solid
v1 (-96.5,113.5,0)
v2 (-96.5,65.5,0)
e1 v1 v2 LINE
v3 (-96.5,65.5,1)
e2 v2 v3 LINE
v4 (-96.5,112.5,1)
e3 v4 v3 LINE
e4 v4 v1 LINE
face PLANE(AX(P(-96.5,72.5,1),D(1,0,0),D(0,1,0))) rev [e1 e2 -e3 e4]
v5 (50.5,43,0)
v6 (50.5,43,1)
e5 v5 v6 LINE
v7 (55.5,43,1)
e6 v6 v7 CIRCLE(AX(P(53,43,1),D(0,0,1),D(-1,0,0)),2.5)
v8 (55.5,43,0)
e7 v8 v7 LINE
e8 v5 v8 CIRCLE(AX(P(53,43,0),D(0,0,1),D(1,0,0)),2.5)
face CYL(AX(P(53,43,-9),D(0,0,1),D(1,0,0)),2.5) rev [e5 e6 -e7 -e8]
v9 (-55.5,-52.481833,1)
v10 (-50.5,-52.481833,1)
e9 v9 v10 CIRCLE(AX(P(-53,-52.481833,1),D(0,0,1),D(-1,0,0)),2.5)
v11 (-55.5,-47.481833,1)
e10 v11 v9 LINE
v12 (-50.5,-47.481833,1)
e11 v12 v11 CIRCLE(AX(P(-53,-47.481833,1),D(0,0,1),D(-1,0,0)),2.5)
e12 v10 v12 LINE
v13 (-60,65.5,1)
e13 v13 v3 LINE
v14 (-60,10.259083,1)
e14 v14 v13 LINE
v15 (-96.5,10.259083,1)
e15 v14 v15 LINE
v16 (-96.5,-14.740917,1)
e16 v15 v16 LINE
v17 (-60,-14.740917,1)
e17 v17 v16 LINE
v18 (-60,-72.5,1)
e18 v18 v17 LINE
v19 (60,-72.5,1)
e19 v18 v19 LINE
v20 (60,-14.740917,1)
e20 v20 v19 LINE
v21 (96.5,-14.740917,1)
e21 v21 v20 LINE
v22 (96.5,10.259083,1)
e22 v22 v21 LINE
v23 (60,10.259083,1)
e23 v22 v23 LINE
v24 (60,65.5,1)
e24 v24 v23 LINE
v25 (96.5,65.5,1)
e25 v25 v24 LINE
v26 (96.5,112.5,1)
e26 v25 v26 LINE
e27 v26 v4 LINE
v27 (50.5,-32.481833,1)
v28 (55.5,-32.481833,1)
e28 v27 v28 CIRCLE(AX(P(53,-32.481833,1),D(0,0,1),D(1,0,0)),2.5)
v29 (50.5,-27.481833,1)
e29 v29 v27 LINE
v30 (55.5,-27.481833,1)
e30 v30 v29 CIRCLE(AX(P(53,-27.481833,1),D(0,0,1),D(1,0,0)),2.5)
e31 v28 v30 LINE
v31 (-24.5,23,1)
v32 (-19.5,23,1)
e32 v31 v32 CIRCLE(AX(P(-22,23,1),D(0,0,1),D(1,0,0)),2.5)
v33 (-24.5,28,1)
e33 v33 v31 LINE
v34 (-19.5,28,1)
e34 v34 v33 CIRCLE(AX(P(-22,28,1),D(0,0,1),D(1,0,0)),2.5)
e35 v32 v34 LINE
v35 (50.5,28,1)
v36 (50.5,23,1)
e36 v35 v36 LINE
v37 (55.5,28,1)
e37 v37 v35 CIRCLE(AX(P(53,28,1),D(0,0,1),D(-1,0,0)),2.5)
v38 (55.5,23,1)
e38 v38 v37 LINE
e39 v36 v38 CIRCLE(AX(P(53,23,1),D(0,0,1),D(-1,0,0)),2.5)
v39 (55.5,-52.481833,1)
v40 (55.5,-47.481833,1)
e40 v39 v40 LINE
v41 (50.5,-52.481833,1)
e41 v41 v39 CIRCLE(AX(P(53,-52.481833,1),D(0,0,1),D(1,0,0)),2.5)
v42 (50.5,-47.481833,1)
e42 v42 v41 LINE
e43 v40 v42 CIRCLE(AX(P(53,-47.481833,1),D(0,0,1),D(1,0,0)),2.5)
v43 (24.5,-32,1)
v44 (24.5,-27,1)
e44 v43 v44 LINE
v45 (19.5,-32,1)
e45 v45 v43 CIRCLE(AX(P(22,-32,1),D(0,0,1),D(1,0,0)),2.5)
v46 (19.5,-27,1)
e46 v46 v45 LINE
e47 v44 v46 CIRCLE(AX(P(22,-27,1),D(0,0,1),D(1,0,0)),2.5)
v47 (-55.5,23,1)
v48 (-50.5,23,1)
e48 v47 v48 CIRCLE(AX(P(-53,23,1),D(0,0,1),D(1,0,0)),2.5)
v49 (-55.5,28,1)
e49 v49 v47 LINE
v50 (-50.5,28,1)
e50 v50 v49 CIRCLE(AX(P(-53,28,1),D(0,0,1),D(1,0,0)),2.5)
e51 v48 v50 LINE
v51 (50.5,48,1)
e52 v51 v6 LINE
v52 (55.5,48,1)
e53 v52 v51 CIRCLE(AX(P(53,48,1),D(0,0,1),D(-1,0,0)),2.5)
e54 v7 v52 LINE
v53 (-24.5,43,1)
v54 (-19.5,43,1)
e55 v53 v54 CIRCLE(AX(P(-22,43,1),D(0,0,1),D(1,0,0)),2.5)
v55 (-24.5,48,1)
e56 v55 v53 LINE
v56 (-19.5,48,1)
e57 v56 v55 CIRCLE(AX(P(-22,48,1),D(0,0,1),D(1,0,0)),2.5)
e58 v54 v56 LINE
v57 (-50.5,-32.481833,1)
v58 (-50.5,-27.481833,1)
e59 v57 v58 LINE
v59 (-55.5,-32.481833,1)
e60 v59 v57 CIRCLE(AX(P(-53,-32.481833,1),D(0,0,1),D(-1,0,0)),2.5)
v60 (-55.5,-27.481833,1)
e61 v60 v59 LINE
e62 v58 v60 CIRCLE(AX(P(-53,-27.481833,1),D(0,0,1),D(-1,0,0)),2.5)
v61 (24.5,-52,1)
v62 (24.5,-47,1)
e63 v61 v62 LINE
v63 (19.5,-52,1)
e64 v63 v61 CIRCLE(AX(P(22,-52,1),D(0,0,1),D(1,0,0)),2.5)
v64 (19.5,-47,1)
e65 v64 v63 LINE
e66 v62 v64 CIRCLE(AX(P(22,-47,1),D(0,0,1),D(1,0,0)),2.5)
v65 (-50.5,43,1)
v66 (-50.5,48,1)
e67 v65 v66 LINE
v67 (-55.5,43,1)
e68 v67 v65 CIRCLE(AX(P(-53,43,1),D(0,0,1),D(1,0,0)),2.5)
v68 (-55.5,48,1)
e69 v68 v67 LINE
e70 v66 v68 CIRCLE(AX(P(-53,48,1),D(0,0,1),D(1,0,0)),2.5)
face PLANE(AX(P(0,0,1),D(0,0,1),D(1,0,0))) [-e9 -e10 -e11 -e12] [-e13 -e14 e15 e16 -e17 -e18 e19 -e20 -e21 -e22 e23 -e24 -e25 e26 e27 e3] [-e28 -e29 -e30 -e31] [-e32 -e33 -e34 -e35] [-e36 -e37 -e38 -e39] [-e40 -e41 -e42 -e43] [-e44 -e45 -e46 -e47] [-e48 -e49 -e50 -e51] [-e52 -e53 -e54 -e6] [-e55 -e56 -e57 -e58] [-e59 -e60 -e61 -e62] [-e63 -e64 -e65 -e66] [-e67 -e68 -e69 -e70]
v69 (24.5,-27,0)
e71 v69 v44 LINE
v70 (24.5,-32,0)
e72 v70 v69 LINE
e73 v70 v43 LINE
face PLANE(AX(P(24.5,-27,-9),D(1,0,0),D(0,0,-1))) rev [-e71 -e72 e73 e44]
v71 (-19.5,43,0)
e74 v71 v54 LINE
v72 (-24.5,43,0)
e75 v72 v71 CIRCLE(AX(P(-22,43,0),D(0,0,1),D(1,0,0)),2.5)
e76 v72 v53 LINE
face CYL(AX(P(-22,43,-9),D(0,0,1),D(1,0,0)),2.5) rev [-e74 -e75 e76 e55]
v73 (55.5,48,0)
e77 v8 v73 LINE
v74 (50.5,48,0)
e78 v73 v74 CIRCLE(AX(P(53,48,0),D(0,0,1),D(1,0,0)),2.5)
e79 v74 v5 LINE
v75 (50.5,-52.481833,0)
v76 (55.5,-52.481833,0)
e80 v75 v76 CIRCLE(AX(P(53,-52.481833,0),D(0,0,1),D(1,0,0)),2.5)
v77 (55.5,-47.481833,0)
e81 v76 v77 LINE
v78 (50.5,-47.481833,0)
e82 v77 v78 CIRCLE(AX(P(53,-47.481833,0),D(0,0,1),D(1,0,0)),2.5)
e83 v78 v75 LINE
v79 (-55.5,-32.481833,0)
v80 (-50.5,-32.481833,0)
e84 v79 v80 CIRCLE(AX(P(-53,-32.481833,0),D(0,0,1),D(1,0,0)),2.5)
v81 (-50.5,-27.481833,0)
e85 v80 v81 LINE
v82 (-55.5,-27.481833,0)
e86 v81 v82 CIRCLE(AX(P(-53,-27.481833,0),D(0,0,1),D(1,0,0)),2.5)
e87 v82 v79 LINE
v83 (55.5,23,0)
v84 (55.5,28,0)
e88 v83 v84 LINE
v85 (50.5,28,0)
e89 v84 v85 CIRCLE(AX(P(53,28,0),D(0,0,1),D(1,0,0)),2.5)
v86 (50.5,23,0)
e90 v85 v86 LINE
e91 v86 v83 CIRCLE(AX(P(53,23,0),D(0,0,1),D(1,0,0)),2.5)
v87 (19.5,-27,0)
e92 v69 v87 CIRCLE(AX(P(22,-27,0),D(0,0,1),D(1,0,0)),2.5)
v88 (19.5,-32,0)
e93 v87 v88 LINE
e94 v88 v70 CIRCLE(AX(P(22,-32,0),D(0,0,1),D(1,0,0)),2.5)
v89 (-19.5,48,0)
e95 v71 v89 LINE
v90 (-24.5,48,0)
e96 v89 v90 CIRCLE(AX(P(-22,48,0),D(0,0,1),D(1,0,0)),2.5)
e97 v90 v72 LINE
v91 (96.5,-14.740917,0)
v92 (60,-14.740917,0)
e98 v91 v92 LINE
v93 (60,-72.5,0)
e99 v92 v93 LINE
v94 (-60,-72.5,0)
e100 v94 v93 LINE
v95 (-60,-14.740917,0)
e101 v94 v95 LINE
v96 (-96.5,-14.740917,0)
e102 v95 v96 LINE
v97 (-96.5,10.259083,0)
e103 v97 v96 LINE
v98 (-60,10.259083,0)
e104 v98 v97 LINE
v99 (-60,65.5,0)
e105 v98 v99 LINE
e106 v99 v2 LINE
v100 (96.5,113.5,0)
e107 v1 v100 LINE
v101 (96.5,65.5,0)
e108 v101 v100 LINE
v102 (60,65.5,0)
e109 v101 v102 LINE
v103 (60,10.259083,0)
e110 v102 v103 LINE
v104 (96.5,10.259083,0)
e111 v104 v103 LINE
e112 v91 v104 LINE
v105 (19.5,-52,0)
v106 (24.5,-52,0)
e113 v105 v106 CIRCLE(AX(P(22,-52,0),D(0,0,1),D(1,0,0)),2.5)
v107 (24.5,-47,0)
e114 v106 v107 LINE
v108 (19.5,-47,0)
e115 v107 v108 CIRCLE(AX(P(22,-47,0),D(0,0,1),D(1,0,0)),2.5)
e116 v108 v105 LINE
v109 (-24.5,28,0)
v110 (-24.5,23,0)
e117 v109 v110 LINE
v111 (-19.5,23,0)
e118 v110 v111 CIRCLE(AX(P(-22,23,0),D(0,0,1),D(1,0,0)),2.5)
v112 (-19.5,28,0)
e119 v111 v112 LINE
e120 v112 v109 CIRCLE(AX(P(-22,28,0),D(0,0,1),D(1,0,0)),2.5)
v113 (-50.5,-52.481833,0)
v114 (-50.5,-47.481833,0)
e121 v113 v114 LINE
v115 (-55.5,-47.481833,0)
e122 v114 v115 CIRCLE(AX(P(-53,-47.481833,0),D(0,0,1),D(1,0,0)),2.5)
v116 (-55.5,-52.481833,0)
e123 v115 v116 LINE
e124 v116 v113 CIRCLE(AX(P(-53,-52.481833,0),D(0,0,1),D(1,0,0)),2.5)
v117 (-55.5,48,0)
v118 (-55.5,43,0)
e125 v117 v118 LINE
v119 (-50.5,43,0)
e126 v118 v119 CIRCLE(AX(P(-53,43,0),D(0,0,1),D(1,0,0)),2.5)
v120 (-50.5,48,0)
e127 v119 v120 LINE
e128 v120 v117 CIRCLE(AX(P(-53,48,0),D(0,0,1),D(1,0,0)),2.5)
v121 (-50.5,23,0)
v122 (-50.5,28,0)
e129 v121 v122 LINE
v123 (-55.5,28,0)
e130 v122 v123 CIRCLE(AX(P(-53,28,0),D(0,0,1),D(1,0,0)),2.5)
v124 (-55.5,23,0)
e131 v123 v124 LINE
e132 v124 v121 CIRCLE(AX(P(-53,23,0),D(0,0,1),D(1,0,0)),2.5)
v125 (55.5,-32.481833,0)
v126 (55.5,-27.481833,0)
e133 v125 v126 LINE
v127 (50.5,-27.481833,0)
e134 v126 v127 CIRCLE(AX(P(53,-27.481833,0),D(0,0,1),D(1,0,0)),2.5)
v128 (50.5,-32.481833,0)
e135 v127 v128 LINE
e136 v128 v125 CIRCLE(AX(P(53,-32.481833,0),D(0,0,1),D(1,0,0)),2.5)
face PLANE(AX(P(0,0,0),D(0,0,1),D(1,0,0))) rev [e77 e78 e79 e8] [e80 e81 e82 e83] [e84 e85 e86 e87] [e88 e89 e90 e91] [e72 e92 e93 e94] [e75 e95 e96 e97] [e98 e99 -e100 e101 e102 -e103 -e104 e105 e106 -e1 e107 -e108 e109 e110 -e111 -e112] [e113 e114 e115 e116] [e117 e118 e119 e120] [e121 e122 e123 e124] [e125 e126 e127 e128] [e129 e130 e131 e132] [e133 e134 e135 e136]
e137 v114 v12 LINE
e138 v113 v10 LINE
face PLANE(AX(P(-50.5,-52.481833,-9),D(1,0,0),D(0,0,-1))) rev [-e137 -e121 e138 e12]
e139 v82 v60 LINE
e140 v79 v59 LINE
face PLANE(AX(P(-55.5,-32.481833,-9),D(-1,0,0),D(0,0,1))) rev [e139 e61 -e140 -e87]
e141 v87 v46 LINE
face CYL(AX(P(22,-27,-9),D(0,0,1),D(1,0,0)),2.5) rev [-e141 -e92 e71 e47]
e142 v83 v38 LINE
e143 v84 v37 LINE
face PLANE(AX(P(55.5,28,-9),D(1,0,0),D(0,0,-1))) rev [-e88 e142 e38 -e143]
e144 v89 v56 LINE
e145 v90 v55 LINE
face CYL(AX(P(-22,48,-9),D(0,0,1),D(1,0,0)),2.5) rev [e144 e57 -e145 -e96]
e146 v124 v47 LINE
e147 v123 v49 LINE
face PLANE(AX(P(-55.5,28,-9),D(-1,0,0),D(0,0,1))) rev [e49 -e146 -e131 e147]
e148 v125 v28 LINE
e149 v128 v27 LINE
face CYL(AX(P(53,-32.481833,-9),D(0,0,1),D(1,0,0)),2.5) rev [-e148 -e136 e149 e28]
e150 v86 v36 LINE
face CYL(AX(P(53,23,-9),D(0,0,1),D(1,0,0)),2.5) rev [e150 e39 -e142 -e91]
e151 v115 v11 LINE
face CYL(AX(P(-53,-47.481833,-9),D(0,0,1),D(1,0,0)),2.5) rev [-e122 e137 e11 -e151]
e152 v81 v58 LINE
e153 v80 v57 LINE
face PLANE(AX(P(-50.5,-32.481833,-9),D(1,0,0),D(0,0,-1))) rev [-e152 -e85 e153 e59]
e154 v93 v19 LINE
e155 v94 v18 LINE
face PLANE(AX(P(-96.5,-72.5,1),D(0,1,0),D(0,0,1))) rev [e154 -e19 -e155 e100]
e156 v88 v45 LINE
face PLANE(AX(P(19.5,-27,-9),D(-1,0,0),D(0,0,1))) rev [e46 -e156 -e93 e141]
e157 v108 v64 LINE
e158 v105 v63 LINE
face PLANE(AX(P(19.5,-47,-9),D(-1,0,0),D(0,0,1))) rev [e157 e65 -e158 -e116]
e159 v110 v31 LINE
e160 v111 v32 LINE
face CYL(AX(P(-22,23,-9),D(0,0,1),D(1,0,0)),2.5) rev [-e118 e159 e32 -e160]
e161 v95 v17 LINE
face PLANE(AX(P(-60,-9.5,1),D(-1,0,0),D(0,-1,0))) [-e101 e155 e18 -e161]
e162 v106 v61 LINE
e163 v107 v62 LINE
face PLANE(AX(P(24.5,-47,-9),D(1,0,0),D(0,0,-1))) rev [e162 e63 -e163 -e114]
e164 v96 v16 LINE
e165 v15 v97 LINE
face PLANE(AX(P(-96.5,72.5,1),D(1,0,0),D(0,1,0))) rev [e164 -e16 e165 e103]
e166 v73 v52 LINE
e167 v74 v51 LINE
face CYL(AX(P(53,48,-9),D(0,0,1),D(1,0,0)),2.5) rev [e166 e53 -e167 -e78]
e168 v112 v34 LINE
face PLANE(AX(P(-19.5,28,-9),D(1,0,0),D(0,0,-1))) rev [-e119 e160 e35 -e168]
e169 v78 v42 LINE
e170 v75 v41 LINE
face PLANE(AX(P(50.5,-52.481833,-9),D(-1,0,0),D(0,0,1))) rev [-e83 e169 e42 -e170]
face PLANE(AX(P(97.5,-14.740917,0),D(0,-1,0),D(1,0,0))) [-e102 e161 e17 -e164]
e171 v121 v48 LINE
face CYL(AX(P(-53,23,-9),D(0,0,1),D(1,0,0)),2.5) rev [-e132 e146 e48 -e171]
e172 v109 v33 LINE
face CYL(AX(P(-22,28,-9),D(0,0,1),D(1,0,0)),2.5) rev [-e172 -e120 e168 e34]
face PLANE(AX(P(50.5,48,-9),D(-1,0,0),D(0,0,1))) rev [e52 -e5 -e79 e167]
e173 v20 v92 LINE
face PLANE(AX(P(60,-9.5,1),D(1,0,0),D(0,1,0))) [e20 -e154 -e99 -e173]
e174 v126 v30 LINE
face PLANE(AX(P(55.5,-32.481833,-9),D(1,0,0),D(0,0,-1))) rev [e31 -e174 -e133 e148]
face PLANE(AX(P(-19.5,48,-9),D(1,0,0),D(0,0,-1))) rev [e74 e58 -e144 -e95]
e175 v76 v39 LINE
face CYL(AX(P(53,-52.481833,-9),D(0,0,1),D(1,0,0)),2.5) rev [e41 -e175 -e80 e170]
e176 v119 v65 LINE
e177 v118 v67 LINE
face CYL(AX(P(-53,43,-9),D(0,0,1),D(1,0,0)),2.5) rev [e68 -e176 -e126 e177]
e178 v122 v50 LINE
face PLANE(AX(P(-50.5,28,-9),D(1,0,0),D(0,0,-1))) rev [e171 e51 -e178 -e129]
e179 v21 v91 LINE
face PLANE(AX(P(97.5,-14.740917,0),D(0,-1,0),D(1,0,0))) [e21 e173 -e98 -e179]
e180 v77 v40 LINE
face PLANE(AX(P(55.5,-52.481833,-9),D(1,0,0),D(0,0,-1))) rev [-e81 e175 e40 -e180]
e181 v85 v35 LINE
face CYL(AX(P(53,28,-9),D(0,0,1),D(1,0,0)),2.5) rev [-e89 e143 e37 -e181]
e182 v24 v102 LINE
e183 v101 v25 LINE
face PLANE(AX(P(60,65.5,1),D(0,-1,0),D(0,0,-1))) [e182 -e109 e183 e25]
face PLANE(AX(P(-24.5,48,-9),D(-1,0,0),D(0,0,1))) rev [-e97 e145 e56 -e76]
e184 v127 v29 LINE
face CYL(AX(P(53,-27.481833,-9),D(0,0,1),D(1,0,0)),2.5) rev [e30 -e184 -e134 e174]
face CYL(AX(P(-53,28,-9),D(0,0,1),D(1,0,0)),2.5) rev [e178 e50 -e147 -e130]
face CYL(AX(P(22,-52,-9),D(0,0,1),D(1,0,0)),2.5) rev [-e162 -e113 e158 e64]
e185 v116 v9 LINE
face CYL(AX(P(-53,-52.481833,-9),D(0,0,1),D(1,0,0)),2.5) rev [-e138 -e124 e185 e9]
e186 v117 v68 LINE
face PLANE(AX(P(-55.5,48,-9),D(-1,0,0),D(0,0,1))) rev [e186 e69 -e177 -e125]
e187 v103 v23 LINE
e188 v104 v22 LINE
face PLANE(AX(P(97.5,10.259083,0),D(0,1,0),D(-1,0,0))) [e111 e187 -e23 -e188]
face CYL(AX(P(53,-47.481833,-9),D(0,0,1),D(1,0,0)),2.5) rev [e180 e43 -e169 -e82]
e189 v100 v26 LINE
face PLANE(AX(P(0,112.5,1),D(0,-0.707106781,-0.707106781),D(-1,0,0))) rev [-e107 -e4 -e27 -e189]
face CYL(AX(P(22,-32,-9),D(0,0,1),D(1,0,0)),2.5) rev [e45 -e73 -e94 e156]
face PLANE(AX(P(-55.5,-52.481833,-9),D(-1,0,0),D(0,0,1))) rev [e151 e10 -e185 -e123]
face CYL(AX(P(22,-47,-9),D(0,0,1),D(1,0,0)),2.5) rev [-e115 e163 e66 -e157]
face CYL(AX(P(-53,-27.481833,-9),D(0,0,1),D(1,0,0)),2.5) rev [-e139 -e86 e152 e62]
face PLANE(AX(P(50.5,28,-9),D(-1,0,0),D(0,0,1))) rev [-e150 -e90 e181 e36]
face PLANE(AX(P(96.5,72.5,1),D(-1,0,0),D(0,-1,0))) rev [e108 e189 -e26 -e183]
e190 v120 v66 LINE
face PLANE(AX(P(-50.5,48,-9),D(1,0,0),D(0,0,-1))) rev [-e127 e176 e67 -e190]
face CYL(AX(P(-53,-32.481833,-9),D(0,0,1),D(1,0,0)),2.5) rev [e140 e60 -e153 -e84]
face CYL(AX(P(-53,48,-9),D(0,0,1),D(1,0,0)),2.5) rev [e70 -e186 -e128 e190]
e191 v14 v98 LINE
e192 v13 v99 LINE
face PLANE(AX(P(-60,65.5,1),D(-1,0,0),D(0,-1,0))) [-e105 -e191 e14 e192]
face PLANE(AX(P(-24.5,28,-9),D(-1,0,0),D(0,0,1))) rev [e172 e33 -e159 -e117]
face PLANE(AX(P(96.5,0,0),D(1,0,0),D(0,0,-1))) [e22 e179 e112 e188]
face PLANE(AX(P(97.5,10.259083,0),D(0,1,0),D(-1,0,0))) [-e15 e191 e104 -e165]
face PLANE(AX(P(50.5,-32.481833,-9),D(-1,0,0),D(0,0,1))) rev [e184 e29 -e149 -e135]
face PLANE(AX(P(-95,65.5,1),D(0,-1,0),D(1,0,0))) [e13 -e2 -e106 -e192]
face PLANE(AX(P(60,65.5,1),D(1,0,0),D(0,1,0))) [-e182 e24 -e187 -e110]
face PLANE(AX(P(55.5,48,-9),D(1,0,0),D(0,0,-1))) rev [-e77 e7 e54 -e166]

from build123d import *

# Parameters (mm, degrees)
SKETCH1_W           = 193
SKETCH1_H           = 145
SKETCH1_W_2         = 35
SKETCH1_H_2         = 60
BOSS_EXTRUDE1_DEPTH = 1
SKETCH2_R           = 2.5
CUT_EXTRUDE1_DEPTH  = 3
SKETCH3_W           = 1.5
SKETCH3_H           = 60.155824732
SKETCH3_H_2         = 60
CUT_EXTRUDE2_DEPTH  = 3
SKETCH4_W           = 193
SKETCH4_H           = 42
BOSS_EXTRUDE2_DEPTH = 1
SKETCH5_W           = 1
SKETCH5_H           = 25
BOSS_EXTRUDE3_DEPTH = 194
CHAMFER1_SIZE       = 2
SKETCH7_W           = 36.5
SKETCH7_H           = 3
CUT_EXTRUDE3_DEPTH  = 10
SKETCH8_R           = 2.5
CUT_EXTRUDE4_DEPTH  = 10
SKETCH11_W          = 1
SKETCH11_H          = 25
CUT_EXTRUDE5_DEPTH  = 1
CUT_EXTRUDE6_DEPTH  = 10


with BuildPart() as part:
    # Sketch1 → Boss-Extrude1 (new body)
    with BuildSketch(Plane.XY):
        Rectangle(SKETCH1_W, SKETCH1_H)
        with Locations((-77.5, 35.5)):
            Rectangle(SKETCH1_W_2, SKETCH1_H_2, mode=Mode.SUBTRACT)
        with Locations((77.5, 35.5)):
            Rectangle(SKETCH1_W_2, SKETCH1_H_2, mode=Mode.SUBTRACT)
        with Locations((77.5, -39.5)):
            Rectangle(SKETCH1_W_2, SKETCH1_H_2, mode=Mode.SUBTRACT)
        with Locations((-77.5, -39.5)):
            Rectangle(SKETCH1_W_2, SKETCH1_H_2, mode=Mode.SUBTRACT)
    extrude(amount=BOSS_EXTRUDE1_DEPTH)

    # Sketch2 → Cut-Extrude1 (cut)
    with BuildSketch(Plane.XY.offset(1)):
        with Locations((-53, 45.5)):
            Circle(SKETCH2_R)
        with Locations((-53, 25.5)):
            Circle(SKETCH2_R)
        with Locations((-53, -49.5)):
            Circle(SKETCH2_R)
        with Locations((-53, -29.5)):
            Circle(SKETCH2_R)
        with Locations((53, -29.5)):
            Circle(SKETCH2_R)
        with Locations((53, -49.5)):
            Circle(SKETCH2_R)
        with Locations((53, 25.5)):
            Circle(SKETCH2_R)
        with Locations((53, 45.5)):
            Circle(SKETCH2_R)
    extrude(amount=-CUT_EXTRUDE1_DEPTH, mode=Mode.SUBTRACT)

    # Sketch3 → Cut-Extrude2 (cut)
    with BuildSketch(Plane.XY.offset(1)):
        with Locations((-95.75, 35.422087634)):
            Rectangle(SKETCH3_W, SKETCH3_H)
        with Locations((-95.75, -39.5)):
            Rectangle(SKETCH3_W, SKETCH3_H_2)
        with Locations((95.75, -39.5)):
            Rectangle(SKETCH3_W, SKETCH3_H_2)
        with Locations((95.75, 35.5)):
            Rectangle(SKETCH3_W, SKETCH3_H_2)
    extrude(amount=-CUT_EXTRUDE2_DEPTH, mode=Mode.SUBTRACT)

    # Sketch4 → Boss-Extrude2 (add)
    with BuildSketch(Plane.XY.offset(1)):
        with Locations((0, 93.5)):
            Rectangle(SKETCH4_W, SKETCH4_H)
    extrude(amount=-BOSS_EXTRUDE2_DEPTH)

    # Sketch5 → Boss-Extrude3 (add)
    with BuildSketch(Plane.ZY.offset(96.5)):
        with Locations((0.5, -2.240916736)):
            Rectangle(SKETCH5_W, SKETCH5_H)
    extrude(amount=-BOSS_EXTRUDE3_DEPTH)

    # Chamfer1
    # the kernel refuses this chamfer: 2 mm, written as the material it takes off along each edge
    with BuildSketch(Plane(origin=(101.643365976, 114.5, 1), x_dir=(0, -0.9996219169112968, 0.027495876610586306), z_dir=(-1, 0, 0))) as chamfer1_piece_1:
        Polygon((CHAMFER1_SIZE * 0.999621916911, -CHAMFER1_SIZE * 0.0274958766106), (-CHAMFER1_SIZE * 0.0274958766106, -CHAMFER1_SIZE * 0.999621916911), (0, 0), align=None)
    extrude(amount=203.286731952, mode=Mode.SUBTRACT)

    # Sketch7 → Cut-Extrude3 (cut)
    with BuildSketch(Plane.XY.offset(1)):
        with Locations((-78.25, -71)):
            Rectangle(SKETCH7_W, SKETCH7_H)
        with Locations((78.25, -71)):
            Rectangle(SKETCH7_W, SKETCH7_H)
    extrude(amount=-CUT_EXTRUDE3_DEPTH, mode=Mode.SUBTRACT)

    # Sketch8 → Cut-Extrude4 (cut)
    with BuildSketch(Plane.XY.offset(1)):
        with Locations((-22, 45.5)):
            Circle(SKETCH8_R)
        with Locations((-22, 25.5)):
            Circle(SKETCH8_R)
        with Locations((22, -29.5)):
            Circle(SKETCH8_R)
        with Locations((22, -49.5)):
            Circle(SKETCH8_R)
    extrude(amount=-CUT_EXTRUDE4_DEPTH, mode=Mode.SUBTRACT)

    # Sketch11 → Cut-Extrude5 (cut)
    with BuildSketch(Plane(origin=(97.5, 0, 0), x_dir=(0, 0, -1), z_dir=(1, 0, 0))):
        with Locations((-0.5, -2.240916736)):
            Rectangle(SKETCH11_W, SKETCH11_H)
    extrude(amount=-CUT_EXTRUDE5_DEPTH, mode=Mode.SUBTRACT)

    # Sketch12 → Cut-Extrude6 (cut)
    with BuildSketch(Plane.XY.offset(1)):
        with BuildLine():
            Line((-50.5, 48), (-50.5, 43))
            ThreePointArc((-50.5, 43), (-53, 40.5), (-55.5, 43))
            Line((-55.5, 43), (-55.5, 48))
            ThreePointArc((-55.5, 48), (-53, 50.5), (-50.5, 48))
        make_face()
        with BuildLine():
            Line((-19.5, 48), (-19.5, 43))
            ThreePointArc((-19.5, 43), (-22, 40.5), (-24.5, 43))
            Line((-24.5, 43), (-24.5, 48))
            ThreePointArc((-24.5, 48), (-22, 50.5), (-19.5, 48))
        make_face()
        with BuildLine():
            Line((-19.5, 28), (-19.5, 23))
            ThreePointArc((-19.5, 23), (-22, 20.5), (-24.5, 23))
            Line((-24.5, 23), (-24.5, 28))
            ThreePointArc((-24.5, 28), (-22, 30.5), (-19.5, 28))
        make_face()
        with BuildLine():
            Line((-50.5, 28), (-50.5, 23))
            ThreePointArc((-50.5, 23), (-53, 20.5), (-55.5, 23))
            Line((-55.5, 23), (-55.5, 28))
            ThreePointArc((-55.5, 28), (-53, 30.5), (-50.5, 28))
        make_face()
        with BuildLine():
            Line((50.5, 28), (50.5, 23))
            ThreePointArc((50.5, 23), (53, 20.5), (55.5, 23))
            Line((55.5, 23), (55.5, 28))
            ThreePointArc((55.5, 28), (53, 30.5), (50.5, 28))
        make_face()
        with BuildLine():
            Line((50.5, 48), (50.5, 43))
            ThreePointArc((50.5, 43), (53, 40.5), (55.5, 43))
            Line((55.5, 43), (55.5, 48))
            ThreePointArc((55.5, 48), (53, 50.5), (50.5, 48))
        make_face()
        with BuildLine():
            Line((50.5, -52.481833472), (50.5, -47.481833472))
            ThreePointArc((50.5, -47.481833472), (53, -44.981833472), (55.5, -47.481833472))
            Line((55.5, -47.481833472), (55.5, -52.481833472))
            ThreePointArc((55.5, -52.481833472), (53, -54.981833472), (50.5, -52.481833472))
        make_face()
        with BuildLine():
            Line((50.5, -32.481833472), (50.5, -27.481833472))
            ThreePointArc((50.5, -27.481833472), (53, -24.981833472), (55.5, -27.481833472))
            Line((55.5, -27.481833472), (55.5, -32.481833472))
            ThreePointArc((55.5, -32.481833472), (53, -34.981833472), (50.5, -32.481833472))
        make_face()
        with BuildLine():
            Line((-50.5, -32.481833472), (-50.5, -27.481833472))
            ThreePointArc((-50.5, -27.481833472), (-53, -24.981833472), (-55.5, -27.481833472))
            Line((-55.5, -27.481833472), (-55.5, -32.481833472))
            ThreePointArc((-55.5, -32.481833472), (-53, -34.981833472), (-50.5, -32.481833472))
        make_face()
        with BuildLine():
            Line((-50.5, -52.481833472), (-50.5, -47.481833472))
            ThreePointArc((-50.5, -47.481833472), (-53, -44.981833472), (-55.5, -47.481833472))
            Line((-55.5, -47.481833472), (-55.5, -52.481833472))
            ThreePointArc((-55.5, -52.481833472), (-53, -54.981833472), (-50.5, -52.481833472))
        make_face()
        with BuildLine():
            Line((24.5, -27), (24.5, -32))
            ThreePointArc((24.5, -32), (22, -34.5), (19.5, -32))
            Line((19.5, -32), (19.5, -27))
            ThreePointArc((19.5, -27), (22, -24.5), (24.5, -27))
        make_face()
        with BuildLine():
            Line((24.5, -47), (24.5, -52))
            ThreePointArc((24.5, -52), (22, -54.5), (19.5, -52))
            Line((19.5, -52), (19.5, -47))
            ThreePointArc((19.5, -47), (22, -44.5), (24.5, -47))
        make_face()
    extrude(amount=-CUT_EXTRUDE6_DEPTH, mode=Mode.SUBTRACT)


solid = part.part
